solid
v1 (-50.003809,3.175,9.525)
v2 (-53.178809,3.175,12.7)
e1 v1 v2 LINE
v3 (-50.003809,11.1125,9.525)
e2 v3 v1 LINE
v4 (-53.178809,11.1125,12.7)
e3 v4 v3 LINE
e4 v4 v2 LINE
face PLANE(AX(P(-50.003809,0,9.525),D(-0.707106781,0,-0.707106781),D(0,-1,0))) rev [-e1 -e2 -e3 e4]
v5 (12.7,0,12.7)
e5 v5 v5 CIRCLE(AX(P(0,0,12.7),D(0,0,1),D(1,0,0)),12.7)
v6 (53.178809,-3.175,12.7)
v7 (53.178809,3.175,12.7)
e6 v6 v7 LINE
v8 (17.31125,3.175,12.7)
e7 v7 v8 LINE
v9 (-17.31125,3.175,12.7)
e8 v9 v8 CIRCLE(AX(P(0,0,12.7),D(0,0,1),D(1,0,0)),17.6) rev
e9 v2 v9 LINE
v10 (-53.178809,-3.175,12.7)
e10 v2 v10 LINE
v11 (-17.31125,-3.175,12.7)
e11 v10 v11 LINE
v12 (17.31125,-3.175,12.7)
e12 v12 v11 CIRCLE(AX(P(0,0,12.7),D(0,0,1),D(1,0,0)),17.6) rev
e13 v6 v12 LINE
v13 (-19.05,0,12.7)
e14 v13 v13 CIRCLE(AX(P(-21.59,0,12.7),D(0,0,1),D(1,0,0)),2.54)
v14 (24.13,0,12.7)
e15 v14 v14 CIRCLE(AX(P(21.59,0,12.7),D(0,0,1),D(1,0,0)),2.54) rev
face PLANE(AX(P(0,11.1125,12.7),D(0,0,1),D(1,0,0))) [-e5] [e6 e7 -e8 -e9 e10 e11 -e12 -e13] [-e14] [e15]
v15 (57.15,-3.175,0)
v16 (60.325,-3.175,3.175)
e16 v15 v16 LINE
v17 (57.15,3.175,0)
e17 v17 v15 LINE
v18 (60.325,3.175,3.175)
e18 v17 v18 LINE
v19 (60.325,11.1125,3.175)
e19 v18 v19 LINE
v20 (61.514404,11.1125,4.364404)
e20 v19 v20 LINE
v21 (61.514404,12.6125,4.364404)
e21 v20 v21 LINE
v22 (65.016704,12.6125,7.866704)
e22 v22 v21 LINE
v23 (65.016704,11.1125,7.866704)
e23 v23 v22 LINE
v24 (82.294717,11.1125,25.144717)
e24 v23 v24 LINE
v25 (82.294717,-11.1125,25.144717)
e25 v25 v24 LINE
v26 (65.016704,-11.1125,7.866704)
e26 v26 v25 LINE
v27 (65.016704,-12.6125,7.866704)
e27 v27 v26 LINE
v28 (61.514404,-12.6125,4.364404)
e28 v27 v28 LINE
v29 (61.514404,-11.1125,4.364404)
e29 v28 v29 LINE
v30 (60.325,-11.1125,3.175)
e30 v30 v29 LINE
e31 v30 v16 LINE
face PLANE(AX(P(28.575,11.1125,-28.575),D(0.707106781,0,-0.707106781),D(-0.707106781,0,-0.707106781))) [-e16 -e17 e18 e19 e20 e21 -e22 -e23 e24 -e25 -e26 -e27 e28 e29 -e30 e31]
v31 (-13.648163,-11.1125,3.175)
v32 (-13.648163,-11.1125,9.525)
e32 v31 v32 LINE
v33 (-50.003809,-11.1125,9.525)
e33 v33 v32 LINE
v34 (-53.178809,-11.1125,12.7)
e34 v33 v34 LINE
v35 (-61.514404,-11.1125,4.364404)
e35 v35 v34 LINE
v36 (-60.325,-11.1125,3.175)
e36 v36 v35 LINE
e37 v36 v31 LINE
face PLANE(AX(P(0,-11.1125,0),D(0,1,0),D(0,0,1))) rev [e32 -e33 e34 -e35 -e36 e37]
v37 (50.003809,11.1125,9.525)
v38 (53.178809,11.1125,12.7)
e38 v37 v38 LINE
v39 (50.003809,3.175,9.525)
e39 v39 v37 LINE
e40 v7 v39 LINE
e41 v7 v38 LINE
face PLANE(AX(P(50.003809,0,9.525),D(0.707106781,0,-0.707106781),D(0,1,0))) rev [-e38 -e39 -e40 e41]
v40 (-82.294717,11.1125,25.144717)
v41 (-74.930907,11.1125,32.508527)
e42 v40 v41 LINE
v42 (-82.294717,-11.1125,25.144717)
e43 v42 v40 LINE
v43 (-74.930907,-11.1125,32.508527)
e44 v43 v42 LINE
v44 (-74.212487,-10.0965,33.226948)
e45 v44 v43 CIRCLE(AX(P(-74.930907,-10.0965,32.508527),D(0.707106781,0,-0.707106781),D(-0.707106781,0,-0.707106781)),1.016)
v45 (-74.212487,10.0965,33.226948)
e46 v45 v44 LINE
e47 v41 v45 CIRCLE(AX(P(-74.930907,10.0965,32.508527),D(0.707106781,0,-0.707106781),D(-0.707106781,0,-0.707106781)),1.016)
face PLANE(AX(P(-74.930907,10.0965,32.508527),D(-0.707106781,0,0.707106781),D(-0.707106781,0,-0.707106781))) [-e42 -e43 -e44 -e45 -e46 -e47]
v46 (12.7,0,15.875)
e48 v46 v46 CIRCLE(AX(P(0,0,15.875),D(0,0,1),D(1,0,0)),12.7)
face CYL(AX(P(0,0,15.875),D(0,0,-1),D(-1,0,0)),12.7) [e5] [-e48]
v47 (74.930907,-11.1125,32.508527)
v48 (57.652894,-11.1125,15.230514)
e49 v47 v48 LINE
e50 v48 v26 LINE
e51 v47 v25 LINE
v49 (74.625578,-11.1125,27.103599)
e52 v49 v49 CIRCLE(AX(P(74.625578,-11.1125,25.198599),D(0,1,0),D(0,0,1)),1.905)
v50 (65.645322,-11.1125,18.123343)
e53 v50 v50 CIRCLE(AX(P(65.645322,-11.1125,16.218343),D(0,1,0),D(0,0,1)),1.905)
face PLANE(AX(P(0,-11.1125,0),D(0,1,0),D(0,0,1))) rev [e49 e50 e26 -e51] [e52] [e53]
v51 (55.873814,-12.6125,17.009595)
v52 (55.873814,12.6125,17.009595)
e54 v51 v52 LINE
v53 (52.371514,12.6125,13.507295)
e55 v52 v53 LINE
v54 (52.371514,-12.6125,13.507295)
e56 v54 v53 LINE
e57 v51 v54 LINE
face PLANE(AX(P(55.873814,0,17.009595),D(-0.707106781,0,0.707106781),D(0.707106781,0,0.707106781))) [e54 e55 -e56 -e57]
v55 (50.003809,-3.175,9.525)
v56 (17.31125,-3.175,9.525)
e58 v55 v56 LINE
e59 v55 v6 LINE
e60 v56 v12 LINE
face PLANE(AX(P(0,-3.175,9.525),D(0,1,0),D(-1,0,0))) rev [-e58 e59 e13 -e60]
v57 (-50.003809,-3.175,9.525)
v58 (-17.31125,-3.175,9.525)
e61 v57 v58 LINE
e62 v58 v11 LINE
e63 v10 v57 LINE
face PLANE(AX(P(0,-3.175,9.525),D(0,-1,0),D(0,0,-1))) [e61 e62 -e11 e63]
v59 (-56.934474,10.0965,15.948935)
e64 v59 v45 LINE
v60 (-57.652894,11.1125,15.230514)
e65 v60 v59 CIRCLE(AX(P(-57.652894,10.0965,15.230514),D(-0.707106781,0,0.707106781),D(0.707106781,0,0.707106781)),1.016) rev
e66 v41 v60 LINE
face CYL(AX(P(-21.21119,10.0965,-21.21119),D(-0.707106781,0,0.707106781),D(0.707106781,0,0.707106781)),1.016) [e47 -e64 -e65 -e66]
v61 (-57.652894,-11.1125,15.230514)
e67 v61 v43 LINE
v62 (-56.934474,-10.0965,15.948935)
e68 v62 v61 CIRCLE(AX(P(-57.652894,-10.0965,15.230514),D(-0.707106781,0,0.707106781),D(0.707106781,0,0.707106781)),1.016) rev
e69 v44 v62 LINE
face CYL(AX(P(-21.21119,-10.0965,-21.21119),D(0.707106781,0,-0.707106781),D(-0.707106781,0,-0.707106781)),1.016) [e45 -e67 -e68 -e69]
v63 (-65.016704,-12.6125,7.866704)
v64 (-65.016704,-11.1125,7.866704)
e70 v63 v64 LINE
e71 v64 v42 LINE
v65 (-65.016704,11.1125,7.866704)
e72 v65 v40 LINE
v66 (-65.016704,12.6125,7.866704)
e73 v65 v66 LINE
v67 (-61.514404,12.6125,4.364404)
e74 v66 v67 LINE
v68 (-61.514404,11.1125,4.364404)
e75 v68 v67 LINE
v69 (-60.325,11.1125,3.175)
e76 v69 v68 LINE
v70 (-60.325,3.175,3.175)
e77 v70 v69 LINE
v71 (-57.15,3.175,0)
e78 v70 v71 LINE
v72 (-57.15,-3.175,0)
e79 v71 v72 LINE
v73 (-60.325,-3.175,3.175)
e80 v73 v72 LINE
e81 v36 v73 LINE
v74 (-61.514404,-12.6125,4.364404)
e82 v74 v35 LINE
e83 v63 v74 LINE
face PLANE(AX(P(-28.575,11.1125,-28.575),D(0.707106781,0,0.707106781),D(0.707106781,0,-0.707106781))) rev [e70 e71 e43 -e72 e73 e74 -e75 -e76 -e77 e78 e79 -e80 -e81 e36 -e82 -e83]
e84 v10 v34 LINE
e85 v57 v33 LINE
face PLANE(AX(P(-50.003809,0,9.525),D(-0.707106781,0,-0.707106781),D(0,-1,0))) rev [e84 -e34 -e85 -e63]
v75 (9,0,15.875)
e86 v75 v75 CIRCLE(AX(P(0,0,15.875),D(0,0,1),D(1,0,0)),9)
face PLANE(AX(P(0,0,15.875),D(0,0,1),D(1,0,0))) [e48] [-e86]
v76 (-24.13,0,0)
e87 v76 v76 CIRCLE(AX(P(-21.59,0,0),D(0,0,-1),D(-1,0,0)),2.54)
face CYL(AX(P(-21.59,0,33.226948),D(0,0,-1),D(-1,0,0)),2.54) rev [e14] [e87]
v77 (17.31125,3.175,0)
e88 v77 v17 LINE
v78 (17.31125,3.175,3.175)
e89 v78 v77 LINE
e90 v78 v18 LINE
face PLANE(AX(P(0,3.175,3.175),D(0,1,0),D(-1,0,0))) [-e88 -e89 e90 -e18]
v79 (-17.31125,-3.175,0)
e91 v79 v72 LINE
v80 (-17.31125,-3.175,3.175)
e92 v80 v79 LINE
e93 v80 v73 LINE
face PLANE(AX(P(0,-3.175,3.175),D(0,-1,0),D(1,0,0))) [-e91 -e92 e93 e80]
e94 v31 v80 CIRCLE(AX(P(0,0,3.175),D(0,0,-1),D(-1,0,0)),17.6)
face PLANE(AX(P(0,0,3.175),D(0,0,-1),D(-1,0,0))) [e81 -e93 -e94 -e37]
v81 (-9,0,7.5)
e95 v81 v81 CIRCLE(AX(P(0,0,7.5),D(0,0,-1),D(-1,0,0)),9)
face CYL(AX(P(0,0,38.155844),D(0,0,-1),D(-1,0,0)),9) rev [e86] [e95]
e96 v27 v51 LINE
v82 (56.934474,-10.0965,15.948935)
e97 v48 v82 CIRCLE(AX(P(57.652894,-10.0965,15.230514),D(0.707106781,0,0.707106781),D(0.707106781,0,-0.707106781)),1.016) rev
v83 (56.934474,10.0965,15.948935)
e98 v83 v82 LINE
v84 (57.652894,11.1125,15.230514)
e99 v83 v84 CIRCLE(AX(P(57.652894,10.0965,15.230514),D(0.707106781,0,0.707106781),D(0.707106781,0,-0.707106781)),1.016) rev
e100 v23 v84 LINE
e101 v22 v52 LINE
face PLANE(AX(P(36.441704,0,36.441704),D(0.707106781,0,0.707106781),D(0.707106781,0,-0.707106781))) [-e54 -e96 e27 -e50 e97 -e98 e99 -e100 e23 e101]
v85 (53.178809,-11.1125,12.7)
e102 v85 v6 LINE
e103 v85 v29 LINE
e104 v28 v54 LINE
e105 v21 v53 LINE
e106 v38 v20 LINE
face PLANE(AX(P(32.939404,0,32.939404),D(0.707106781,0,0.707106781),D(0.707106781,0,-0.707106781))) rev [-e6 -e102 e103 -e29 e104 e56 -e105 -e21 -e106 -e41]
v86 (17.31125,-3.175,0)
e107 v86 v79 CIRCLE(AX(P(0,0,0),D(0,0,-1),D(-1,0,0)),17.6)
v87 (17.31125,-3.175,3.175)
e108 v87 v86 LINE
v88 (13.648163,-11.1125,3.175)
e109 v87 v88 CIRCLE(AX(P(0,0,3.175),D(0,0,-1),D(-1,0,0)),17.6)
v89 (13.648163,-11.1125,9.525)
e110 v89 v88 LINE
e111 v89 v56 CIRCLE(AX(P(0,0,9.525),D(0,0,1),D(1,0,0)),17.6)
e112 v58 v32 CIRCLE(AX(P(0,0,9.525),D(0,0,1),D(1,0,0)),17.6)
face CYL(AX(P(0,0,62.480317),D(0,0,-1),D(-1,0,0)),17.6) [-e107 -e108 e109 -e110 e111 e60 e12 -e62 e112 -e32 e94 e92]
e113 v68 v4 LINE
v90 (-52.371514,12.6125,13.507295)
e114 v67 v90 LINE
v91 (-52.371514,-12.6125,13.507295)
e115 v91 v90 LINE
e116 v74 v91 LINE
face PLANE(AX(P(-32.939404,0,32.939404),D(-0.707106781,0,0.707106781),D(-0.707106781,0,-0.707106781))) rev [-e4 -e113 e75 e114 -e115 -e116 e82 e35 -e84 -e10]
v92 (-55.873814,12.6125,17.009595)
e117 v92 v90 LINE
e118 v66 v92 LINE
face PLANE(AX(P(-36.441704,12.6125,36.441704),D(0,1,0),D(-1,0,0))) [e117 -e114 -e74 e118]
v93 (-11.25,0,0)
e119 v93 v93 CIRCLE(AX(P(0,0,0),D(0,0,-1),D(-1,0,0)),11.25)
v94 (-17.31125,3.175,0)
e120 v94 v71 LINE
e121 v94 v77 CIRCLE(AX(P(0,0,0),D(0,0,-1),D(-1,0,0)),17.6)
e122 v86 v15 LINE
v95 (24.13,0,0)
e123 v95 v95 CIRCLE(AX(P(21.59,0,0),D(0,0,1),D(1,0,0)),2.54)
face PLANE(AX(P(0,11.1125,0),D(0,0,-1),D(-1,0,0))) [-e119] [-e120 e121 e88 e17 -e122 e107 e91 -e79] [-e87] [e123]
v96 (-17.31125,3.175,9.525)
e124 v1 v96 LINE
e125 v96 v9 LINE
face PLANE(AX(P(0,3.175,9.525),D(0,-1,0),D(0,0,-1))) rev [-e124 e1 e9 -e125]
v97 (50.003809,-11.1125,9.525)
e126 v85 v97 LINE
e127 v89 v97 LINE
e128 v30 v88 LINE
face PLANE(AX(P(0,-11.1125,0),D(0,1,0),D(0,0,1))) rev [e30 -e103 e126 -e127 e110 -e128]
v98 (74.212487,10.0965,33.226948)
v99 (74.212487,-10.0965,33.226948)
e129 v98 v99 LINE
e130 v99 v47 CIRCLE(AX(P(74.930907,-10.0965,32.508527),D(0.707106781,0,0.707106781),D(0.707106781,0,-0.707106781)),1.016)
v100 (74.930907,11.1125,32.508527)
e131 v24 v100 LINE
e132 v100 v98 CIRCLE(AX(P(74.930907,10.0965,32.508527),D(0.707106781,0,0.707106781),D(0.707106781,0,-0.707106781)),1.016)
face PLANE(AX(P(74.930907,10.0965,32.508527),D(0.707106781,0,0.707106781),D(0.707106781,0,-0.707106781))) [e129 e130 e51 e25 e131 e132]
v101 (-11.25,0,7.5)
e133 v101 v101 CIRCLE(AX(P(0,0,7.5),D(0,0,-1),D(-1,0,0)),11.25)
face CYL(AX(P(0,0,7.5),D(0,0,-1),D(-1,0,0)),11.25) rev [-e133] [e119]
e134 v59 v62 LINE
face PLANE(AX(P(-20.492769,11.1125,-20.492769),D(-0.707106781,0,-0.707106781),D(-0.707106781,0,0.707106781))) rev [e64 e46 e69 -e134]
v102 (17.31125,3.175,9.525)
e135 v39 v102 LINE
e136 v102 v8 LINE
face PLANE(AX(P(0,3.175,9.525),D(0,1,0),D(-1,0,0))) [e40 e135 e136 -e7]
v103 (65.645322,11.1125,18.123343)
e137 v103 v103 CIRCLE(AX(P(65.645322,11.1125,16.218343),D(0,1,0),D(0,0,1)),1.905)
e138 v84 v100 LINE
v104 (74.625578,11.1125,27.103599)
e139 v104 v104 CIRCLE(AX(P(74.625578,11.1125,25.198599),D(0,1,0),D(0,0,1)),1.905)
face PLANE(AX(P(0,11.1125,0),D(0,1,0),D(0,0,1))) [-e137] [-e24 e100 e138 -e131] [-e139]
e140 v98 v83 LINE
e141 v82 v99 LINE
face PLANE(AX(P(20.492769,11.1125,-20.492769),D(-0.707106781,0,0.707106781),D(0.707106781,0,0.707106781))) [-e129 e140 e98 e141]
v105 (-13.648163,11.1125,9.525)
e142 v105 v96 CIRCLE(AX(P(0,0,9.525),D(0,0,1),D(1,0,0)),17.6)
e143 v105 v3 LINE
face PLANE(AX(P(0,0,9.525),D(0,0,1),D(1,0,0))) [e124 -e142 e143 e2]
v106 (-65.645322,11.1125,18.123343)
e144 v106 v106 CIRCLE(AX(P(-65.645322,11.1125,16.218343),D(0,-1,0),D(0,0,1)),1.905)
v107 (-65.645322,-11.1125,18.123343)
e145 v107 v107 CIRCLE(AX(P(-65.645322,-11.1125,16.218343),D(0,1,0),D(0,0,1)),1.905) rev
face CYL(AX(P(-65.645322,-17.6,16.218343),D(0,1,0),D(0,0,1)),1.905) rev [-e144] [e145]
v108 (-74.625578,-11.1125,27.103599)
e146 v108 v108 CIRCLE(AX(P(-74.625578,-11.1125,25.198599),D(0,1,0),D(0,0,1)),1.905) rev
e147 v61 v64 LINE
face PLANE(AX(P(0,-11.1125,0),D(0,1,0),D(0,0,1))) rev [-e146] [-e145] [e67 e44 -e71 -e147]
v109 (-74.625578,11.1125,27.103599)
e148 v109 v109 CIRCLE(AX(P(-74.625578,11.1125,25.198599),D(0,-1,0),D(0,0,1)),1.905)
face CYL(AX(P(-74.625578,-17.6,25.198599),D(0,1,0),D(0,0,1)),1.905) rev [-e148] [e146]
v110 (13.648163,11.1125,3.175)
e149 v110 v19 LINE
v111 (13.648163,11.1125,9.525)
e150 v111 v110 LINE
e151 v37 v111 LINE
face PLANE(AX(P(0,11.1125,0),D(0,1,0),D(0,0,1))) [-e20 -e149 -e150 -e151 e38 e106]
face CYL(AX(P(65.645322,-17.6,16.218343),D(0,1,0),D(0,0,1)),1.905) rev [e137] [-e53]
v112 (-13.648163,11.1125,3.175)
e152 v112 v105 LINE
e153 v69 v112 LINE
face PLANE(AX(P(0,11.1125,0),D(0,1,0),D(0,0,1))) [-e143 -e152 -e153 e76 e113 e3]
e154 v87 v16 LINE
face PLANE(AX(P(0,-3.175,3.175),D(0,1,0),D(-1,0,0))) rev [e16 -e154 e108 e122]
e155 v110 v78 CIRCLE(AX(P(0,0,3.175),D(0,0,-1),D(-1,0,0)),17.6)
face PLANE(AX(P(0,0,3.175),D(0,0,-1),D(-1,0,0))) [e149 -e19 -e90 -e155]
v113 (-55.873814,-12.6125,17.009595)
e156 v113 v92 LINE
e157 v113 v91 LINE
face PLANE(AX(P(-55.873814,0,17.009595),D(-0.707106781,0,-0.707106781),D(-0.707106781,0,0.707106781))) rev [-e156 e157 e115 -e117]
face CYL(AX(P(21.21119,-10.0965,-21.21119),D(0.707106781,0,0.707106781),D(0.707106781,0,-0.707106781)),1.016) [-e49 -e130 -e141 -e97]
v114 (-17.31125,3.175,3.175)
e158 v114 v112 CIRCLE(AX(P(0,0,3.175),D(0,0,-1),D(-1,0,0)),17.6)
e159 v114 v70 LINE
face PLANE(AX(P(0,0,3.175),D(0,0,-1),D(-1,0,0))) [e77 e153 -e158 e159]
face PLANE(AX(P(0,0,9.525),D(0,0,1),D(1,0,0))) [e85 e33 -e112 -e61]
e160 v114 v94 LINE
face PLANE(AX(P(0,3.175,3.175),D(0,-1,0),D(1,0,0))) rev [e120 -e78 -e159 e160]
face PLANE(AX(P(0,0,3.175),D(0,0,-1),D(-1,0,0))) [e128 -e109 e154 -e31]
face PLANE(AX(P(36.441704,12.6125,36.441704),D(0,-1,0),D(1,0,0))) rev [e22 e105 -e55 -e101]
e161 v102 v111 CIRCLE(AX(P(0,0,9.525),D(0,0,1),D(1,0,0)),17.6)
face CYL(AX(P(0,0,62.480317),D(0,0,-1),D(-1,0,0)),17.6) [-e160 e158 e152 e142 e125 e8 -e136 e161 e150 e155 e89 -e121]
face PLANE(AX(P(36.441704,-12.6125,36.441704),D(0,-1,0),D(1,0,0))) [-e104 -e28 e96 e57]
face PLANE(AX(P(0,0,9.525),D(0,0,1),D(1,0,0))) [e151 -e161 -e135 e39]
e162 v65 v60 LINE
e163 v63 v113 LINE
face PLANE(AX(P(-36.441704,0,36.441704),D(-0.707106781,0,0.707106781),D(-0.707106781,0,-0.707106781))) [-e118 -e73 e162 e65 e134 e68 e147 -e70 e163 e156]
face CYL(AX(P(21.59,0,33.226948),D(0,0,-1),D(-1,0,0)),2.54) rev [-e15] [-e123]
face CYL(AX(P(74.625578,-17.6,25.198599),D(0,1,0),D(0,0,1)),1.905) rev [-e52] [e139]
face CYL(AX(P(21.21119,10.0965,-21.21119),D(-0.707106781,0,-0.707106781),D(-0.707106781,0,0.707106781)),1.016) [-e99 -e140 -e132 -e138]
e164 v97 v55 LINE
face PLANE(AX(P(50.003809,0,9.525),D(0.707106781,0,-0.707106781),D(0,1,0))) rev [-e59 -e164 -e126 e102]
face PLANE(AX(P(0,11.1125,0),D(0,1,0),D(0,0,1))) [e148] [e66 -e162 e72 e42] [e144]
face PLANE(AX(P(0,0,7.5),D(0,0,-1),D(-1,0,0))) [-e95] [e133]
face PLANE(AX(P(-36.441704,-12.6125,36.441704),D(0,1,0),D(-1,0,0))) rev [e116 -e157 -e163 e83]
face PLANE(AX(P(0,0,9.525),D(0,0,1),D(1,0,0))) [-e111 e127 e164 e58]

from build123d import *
from build123d.topology import SkipClean

# Parameters (mm, degrees)
BOSS_EXTRUDE1_DEPTH = 11.1125
SKETCH3_R           = 17.6
BOSS_EXTRUDE2_DEPTH = 12.7
SKETCH3_5_R         = 11.25
CUT_EXTRUDE2_DEPTH  = 7.5
SKETCH3_6_R         = 9
CUT_EXTRUDE3_DEPTH  = 12.7
BOSS_EXTRUDE3_START = -31.9278
BOSS_EXTRUDE3_DEPTH = 4.953
FILLET1_R           = 1.016
SKETCH5_R           = 1.905
CUT_EXTRUDE4_DEPTH  = 96.510603758
FILLET3_R           = 1.016
CUT_EXTRUDE5_START  = -3.175
CUT_EXTRUDE5_DEPTH  = 3.175
SKETCH9_W           = 10.961249955
SKETCH9_H           = 7.9375
CUT_EXTRUDE6_DEPTH  = 3.175
CUT_EXTRUDE9_DEPTH  = 2.54
SKETCH13_R          = 12.7
SKETCH13_R_2        = 9
BOSS_EXTRUDE6_DEPTH = 3.175
CHAMFER2_SIZE       = 3.175
SKETCH15_R          = 2.54
CUT_EXTRUDE10_DEPTH = 91.477679673


with BuildPart() as part:
    # Sketch2 → Boss-Extrude1 (new, symmetric)
    with BuildSketch(Plane(origin=(0, 0, 0), x_dir=(1, 0, 0), z_dir=(0, 1, 0))):
        Polygon((0, 0), (-57.15, 0), (-84.090768363, -26.940768363), (-76.008537854, -35.022998872), (-53.685538982, -12.7), (0, -12.7), align=None)
        Polygon((57.15, 0), (0, 0), (0, -12.7), (53.685538982, -12.7), (76.008537854, -35.022998872), (84.090768363, -26.940768363), align=None)
    extrude(amount=BOSS_EXTRUDE1_DEPTH, both=True)

    # Sketch3 → Boss-Extrude2 (add)
    with BuildSketch(Plane(origin=(0, 0, 0), x_dir=(-1, 0, 0), z_dir=(0, 0, -1))):
        Circle(SKETCH3_R)
    extrude(amount=-BOSS_EXTRUDE2_DEPTH)

    # Sketch3<5> → Cut-Extrude2 (cut)
    with BuildSketch(Plane(origin=(0, 0, 0), x_dir=(-1, 0, 0), z_dir=(0, 0, -1))):
        Circle(SKETCH3_5_R)
    extrude(amount=-CUT_EXTRUDE2_DEPTH, mode=Mode.SUBTRACT)

    # Sketch3<6> → Cut-Extrude3 (cut)
    with BuildSketch(Plane(origin=(0, 0, 0), x_dir=(-1, 0, 0), z_dir=(0, 0, -1))):
        Circle(SKETCH3_6_R)
    extrude(amount=-CUT_EXTRUDE3_DEPTH, mode=Mode.SUBTRACT)

    # Sketch4 → Boss-Extrude3 (add)
    with BuildSketch(Plane(origin=(55.515768363, 0, 55.515768363), x_dir=(0.707106781186549, 0, -0.707106781186546), z_dir=(0.707106781186546, 0, 0.707106781186549)).offset(BOSS_EXTRUDE3_START)):
        Polygon((27.481152545, -12.6125), (40.411152545, -12.6125), (40.411152545, -11.1125), (28.981152545, -11.1125), (28.981152545, 11.1125), (40.411152545, 11.1125), (40.411152545, 12.6125), (27.481152545, 12.6125), align=None)
    boss_extrude3 = extrude(amount=BOSS_EXTRUDE3_DEPTH)

    # Fillet1
    fillet1_edges = [part.edges().sort_by_distance(p)[0] for p in [
        (66.471505854, -11.1125, 25.485966872),
        (66.471505854, 11.1125, 25.485966872),
    ]]
    fillet(fillet1_edges, radius=FILLET1_R)

    # Sketch5 → Cut-Extrude4 (cut, through all)
    with BuildSketch(Plane(origin=(0, 11.1125, 0), x_dir=(1, 0, 0), z_dir=(0, 1, 0))):
        with BuildLine():
            ThreePointArc((73.278539993, -23.851560258), (73.278539993, -26.545637094), (75.97261683, -26.545637094))
            Line((75.97261683, -26.545637094), (73.278539993, -23.851560258))
        make_face()
        with BuildLine():
            Line((73.278539993, -23.851560258), (75.97261683, -26.545637094))
            ThreePointArc((75.97261683, -26.545637094), (76.385568921, -25.927610614), (76.530578412, -25.198598676))
            ThreePointArc((76.530578412, -25.198598676), (75.35459035, -23.438608166), (73.278539993, -23.851560258))
        make_face()
        with Locations(Location((65.645322291, -16.218342555, 0), (0, 0, 270))):
            Circle(SKETCH5_R)
    cut_extrude4 = extrude(amount=-CUT_EXTRUDE4_DEPTH, mode=Mode.SUBTRACT)

    # Mirror2: Boss-Extrude3, Cut-Extrude4 across plane
    add(boss_extrude3.mirror(Plane(origin=(0, 0, 0), x_dir=(0, 0, 1), z_dir=(1, 0, 0))))
    add(cut_extrude4.mirror(Plane(origin=(0, 0, 0), x_dir=(0, 0, 1), z_dir=(1, 0, 0))), mode=Mode.SUBTRACT)

    # Fillet3
    fillet3_edges = [part.edges().sort_by_distance(p)[0] for p in [
        (-66.471505854, -11.1125, 25.485966872),
        (-66.471505854, 11.1125, 25.485966872),
    ]]
    fillet(fillet3_edges, radius=FILLET3_R)

    # Sketch6 → Cut-Extrude5 (cut)
    with BuildSketch(Plane.XY.offset(12.7).offset(CUT_EXTRUDE5_START)):
        with BuildLine():
            Line((-53.17880895, 11.1125), (-53.17880895, 3.175))
            Line((-53.17880895, 3.175), (-17.311249955, 3.175))
            ThreePointArc((-17.311249955, 3.175), (-15.980371829, 7.374802791), (-13.648162651, 11.1125))
            Line((-13.648162651, 11.1125), (-53.17880895, 11.1125))
        make_face()
        with BuildLine():
            Line((-17.311249955, -3.175), (-53.17880895, -3.175))
            Line((-53.17880895, -3.175), (-53.17880895, -11.1125))
            Line((-53.17880895, -11.1125), (-13.648162651, -11.1125))
            ThreePointArc((-13.648162651, -11.1125), (-15.980371829, -7.374802791), (-17.311249955, -3.175))
        make_face()
        with BuildLine():
            Line((53.17880895, 11.1125), (13.648162651, 11.1125))
            ThreePointArc((13.648162651, 11.1125), (15.980371829, 7.374802791), (17.311249955, 3.175))
            Line((17.311249955, 3.175), (53.17880895, 3.175))
            Line((53.17880895, 3.175), (53.17880895, 11.1125))
        make_face()
        with BuildLine():
            ThreePointArc((17.311249955, -3.175), (15.980371829, -7.374802791), (13.648162651, -11.1125))
            Line((13.648162651, -11.1125), (53.17880895, -11.1125))
            Line((53.17880895, -11.1125), (53.17880895, -3.175))
            Line((53.17880895, -3.175), (17.311249955, -3.175))
        make_face()
    extrude(amount=CUT_EXTRUDE5_DEPTH, mode=Mode.SUBTRACT)

    # Sketch9 → Cut-Extrude6 (cut)
    with SkipClean():  # the faces are left unmerged after this step: merging them gives an invalid solid
        with BuildSketch(Plane(origin=(0, 0, 0), x_dir=(-1, 0, 0), z_dir=(0, 0, -1))):
            with Locations((62.630624978, -7.14375)):
                Rectangle(SKETCH9_W, SKETCH9_H)
            with BuildLine():
                ThreePointArc((17.311249955, -3.175), (15.980371829, -7.374802791), (13.648162651, -11.1125))
                Line((13.648162651, -11.1125), (57.15, -11.1125))
                Line((57.15, -11.1125), (57.15, -3.175))
                Line((57.15, -3.175), (17.311249955, -3.175))
            make_face()
            with BuildLine():
                Line((57.15, 11.1125), (13.648162651, 11.1125))
                ThreePointArc((13.648162651, 11.1125), (15.980371829, 7.374802791), (17.311249955, 3.175))
                Line((17.311249955, 3.175), (57.15, 3.175))
                Line((57.15, 3.175), (57.15, 11.1125))
            make_face()
            with Locations((62.630624978, 7.14375)):
                Rectangle(SKETCH9_W, SKETCH9_H)
            with BuildLine():
                ThreePointArc((-13.648162651, -11.1125), (-15.980371829, -7.374802791), (-17.311249955, -3.175))
                Line((-17.311249955, -3.175), (-57.15, -3.175))
                Line((-57.15, -3.175), (-57.15, -11.1125))
                Line((-57.15, -11.1125), (-13.648162651, -11.1125))
            make_face()
            with Locations((-62.630624978, -7.14375)):
                Rectangle(SKETCH9_W, SKETCH9_H)
            with BuildLine():
                Line((-57.15, 3.175), (-17.311249955, 3.175))
                ThreePointArc((-17.311249955, 3.175), (-15.980371829, 7.374802791), (-13.648162651, 11.1125))
                Line((-13.648162651, 11.1125), (-57.15, 11.1125))
                Line((-57.15, 11.1125), (-57.15, 3.175))
            make_face()
            with Locations((-62.630624978, 7.14375)):
                Rectangle(SKETCH9_W, SKETCH9_H)
        extrude(amount=-CUT_EXTRUDE6_DEPTH, mode=Mode.SUBTRACT)

    # Sketch12 → Cut-Extrude9 (cut)
    with SkipClean():  # the faces are left unmerged after this step: merging them gives an invalid solid
        with BuildSketch(Plane(origin=(55.515768363, 0, 55.515768363), x_dir=(0.7071067811865486, 0, -0.7071067811865465), z_dir=(0.7071067811865465, 0, 0.7071067811865486))):
            with BuildLine():
                Line((28.981152545, 10.0965), (28.981152545, -10.0965))
                ThreePointArc((28.981152545, -10.0965), (29.278732055, -10.81492049), (29.997152545, -11.1125))
                Line((29.997152545, -11.1125), (40.411152545, -11.1125))
                Line((40.411152545, -11.1125), (40.411152545, 11.1125))
                Line((40.411152545, 11.1125), (29.997152545, 11.1125))
                ThreePointArc((29.997152545, 11.1125), (29.278732055, 10.81492049), (28.981152545, 10.0965))
            make_face()
        cut_extrude9 = extrude(amount=-CUT_EXTRUDE9_DEPTH, mode=Mode.SUBTRACT)

    # Mirror3: Cut-Extrude9 across plane
    with SkipClean():  # the faces are left unmerged after this step: merging them gives an invalid solid
        add(cut_extrude9.mirror(Plane(origin=(0, 0, 0), x_dir=(0, 0, 1), z_dir=(1, 0, 0))), mode=Mode.SUBTRACT)

    # Sketch13 → Boss-Extrude6 (add)
    with SkipClean():  # the faces are left unmerged after this step: merging them gives an invalid solid
        with BuildSketch(Plane.XY.offset(12.7)):
            Circle(SKETCH13_R)
            with Locations(Location((0, 0, 0), (0, 0, 180))):
                Circle(SKETCH13_R_2, mode=Mode.SUBTRACT)
        extrude(amount=BOSS_EXTRUDE6_DEPTH)

    # Chamfer2
    chamfer2_edges = [part.edges().sort_by_distance(p)[0] for p in [
        (53.17880895, 7.14375, 9.525),
        (53.17880895, -7.14375, 9.525),
        (-53.17880895, 7.14375, 9.525),
        (-53.17880895, -7.14375, 9.525),
    ]]
    chamfer(chamfer2_edges, length=CHAMFER2_SIZE - 0.0001)  # a hair under: the kernel refuses the full size

    # Sketch15 → Cut-Extrude10 (cut, through all)
    with BuildSketch(Plane(origin=(0, 0, 0), x_dir=(-1, 0, 0), z_dir=(0, 0, -1))):
        with Locations((21.59, 0)):
            Circle(SKETCH15_R)
        with Locations(Location((-21.59, 0, 0), (0, 0, 180))):
            Circle(SKETCH15_R)
    extrude(amount=-CUT_EXTRUDE10_DEPTH, mode=Mode.SUBTRACT)


solid = part.part
